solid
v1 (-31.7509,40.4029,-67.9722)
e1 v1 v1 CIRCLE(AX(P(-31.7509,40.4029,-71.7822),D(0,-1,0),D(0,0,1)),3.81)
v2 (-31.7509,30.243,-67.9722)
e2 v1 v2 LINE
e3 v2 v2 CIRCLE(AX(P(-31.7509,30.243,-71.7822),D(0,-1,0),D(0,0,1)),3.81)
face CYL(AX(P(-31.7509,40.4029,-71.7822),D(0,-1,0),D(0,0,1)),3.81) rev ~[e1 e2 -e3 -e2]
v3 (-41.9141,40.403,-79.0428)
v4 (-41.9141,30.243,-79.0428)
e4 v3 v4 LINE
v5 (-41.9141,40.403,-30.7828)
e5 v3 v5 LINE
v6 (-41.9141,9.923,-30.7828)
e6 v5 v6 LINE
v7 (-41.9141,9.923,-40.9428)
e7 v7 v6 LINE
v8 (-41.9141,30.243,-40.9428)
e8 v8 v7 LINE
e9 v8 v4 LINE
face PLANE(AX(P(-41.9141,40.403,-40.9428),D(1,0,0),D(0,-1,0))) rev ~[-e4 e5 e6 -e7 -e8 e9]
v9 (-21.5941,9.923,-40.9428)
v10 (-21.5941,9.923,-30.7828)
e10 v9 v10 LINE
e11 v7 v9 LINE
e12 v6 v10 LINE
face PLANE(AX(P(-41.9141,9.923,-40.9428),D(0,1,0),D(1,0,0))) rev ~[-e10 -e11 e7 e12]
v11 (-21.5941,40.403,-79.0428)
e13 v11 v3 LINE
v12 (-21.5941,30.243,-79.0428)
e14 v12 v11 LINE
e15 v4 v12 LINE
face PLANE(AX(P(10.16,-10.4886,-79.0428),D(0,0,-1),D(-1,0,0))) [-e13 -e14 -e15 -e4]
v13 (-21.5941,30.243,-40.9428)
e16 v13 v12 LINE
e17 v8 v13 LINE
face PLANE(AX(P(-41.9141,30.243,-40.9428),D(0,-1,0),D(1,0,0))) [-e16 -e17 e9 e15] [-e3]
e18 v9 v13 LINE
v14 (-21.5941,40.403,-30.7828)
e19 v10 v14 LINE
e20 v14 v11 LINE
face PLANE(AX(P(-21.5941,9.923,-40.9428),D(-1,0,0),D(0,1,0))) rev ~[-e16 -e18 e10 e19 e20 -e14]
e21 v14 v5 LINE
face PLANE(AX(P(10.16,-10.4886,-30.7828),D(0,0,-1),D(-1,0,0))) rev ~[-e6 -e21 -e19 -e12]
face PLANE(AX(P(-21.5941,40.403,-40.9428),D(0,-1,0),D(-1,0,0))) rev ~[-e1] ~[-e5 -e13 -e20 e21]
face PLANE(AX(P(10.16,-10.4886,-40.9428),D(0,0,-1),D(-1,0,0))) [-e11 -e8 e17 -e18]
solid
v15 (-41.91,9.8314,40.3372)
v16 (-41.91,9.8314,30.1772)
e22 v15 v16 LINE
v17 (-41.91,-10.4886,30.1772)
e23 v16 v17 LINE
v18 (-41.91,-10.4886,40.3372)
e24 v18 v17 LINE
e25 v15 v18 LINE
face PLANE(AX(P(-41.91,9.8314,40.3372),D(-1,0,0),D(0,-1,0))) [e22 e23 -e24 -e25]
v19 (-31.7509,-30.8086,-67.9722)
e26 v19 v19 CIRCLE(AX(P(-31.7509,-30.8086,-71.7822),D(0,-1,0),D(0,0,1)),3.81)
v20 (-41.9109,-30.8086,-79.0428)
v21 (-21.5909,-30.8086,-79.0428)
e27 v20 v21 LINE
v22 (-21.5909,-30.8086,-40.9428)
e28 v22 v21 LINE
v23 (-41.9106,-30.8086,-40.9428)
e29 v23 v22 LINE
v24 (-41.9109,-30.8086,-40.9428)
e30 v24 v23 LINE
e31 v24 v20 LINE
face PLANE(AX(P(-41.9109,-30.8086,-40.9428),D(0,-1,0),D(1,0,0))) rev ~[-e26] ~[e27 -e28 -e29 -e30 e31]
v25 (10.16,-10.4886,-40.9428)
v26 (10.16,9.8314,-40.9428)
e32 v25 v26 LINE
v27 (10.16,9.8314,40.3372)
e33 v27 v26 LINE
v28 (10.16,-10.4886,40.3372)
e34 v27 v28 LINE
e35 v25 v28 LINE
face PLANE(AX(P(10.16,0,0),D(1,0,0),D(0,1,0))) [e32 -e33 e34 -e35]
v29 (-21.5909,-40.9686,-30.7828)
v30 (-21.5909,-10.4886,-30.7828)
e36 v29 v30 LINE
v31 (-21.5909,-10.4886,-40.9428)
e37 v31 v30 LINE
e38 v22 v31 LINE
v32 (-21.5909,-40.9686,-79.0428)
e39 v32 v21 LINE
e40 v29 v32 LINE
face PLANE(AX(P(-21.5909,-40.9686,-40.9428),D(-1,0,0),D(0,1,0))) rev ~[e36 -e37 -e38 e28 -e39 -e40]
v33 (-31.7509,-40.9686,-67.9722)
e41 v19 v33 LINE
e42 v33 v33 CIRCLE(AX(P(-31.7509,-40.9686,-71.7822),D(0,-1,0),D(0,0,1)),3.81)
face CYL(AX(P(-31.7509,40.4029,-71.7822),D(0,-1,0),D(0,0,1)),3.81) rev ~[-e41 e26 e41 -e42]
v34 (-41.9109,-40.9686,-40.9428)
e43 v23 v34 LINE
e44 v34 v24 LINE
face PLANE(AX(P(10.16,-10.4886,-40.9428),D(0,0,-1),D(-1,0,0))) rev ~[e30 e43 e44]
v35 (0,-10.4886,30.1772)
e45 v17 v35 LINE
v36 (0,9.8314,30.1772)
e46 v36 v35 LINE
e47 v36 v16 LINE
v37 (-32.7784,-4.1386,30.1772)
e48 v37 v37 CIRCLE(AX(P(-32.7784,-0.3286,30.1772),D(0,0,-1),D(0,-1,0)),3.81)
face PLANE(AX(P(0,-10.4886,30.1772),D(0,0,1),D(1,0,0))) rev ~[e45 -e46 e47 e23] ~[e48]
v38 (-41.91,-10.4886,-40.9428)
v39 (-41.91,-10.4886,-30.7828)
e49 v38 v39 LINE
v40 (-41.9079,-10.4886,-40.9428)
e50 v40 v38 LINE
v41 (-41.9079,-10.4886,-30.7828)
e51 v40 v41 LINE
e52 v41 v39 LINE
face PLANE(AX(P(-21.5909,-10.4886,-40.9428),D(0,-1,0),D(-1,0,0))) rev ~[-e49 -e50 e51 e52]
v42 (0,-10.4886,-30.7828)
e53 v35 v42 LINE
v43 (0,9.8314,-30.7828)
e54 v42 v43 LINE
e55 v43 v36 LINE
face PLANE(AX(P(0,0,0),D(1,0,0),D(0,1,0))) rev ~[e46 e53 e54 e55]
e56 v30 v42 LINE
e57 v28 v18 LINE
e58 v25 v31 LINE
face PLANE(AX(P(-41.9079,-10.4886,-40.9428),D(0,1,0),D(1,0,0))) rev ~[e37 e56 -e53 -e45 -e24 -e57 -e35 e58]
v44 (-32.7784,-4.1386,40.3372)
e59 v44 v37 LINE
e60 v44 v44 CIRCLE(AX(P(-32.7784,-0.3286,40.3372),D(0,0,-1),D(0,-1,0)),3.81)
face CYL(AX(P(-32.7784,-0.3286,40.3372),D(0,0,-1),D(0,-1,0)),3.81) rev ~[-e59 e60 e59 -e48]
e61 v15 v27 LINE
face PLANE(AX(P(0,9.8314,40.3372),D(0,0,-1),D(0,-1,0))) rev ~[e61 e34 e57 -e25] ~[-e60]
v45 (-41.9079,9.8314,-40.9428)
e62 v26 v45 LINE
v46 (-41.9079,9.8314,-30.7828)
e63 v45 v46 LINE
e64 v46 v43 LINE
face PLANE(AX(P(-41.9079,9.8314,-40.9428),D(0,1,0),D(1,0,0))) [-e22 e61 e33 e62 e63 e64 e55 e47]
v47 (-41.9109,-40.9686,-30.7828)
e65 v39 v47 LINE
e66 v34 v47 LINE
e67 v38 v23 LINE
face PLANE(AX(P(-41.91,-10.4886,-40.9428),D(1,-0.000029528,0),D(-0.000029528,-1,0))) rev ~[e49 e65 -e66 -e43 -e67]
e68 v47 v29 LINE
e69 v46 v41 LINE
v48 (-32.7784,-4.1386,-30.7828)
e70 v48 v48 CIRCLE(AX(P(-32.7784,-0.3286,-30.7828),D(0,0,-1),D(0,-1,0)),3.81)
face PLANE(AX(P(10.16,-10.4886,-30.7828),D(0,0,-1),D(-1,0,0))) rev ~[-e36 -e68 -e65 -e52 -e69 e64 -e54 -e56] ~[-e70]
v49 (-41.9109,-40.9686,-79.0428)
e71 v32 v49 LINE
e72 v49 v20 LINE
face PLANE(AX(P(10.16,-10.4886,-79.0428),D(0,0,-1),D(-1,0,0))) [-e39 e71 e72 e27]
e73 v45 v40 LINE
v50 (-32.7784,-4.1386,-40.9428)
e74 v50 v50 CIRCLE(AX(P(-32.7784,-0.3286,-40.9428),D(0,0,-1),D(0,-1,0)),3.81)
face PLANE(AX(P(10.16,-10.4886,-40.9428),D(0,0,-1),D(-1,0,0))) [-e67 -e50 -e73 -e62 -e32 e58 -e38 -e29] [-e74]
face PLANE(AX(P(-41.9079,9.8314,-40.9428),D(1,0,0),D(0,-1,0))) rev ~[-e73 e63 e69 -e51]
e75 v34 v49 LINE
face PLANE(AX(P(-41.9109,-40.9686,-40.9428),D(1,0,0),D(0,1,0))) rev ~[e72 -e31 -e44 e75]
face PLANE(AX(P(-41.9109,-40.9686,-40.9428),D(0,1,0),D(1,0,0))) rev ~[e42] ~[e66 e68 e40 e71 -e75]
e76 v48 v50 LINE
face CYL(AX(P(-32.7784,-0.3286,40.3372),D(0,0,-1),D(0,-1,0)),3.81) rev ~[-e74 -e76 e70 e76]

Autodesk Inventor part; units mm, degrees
ref_plane "YZ Plane" through (0, 0, 0) normal (1, 0, 0) x (0, 1, 0)
ref_plane "XZ Plane" through (0, 0, 0) normal (0, 1, 0) x (-1, 0, 0)
ref_plane "XY Plane" through (0, 0, 0) normal (0, 0, 1) x (1, 0, 0)
sketch "Sketch1" plane through (0, 0, 0) normal (1, 0, 0) x (0, 1, 0)
  line L0 (9.8314, 40.3372) -> (-10.4886, 40.3372)
  line L1 (-10.4886, 40.3372) -> (-10.4886, -40.9428)
  line L2 (-10.4886, -40.9428) -> (9.8314, -40.9428)
  line L3 (9.8314, -40.9428) -> (9.8314, 40.3372)
  point P0 (0, 0)
  dimension "d0" = 20.32
  dimension "d1" = 81.28
extrude "Extrusion1" add sketch "Sketch1" along normal blind 10.16
sketch "Sketch2" plane through (0, -10.4886, 40.3372) normal (0, 0, 1) x (1, 0, 0)
  point P0 (0, 10.4886)
sketch "Sketch3" plane through (0, -10.4886, 40.3372) normal (0, 0, 1) x (1, 0, 0)
  line L0 (10.16, 0) -> (10.16, 20.32) projected
  line L1 (10.16, 20.32) -> (-41.91, 20.32)
  line L2 (-41.91, 20.32) -> (-41.91, 0)
  line L3 (-41.91, 0) -> (10.16, 0)
  line L4 (10.16, 0) -> (10.16, 20.32)
  point P0 (0, 10.4886)
  dimension "d4" = 52.07
extrude "Extrusion2" add sketch "Sketch3" against normal blind 10.16
sketch "Sketch4" plane through (0, -10.4886, -40.9428) normal (0, 0, -1) x (-1, 0, 0)
  line L0 (41.91, 20.32) -> (-10.16, 20.32) projected
  line L1 (41.91, 0) -> (-10.16, 0) projected
  line L2 (-10.16, 20.32) -> (21.59, 20.32)
  line L3 (21.59, 20.32) -> (21.59, 0)
  line L4 (21.59, 0) -> (-10.16, 0)
  line L5 (-10.16, 0) -> (-10.16, 20.32)
  point P0 (0, 10.4886)
  dimension "d7" = 31.75
extrude "Extrusion3" add sketch "Sketch4" against normal blind 10.16
sketch "Sketch5" plane through (10.16, -10.4886, -40.9428) normal (0, 0, -1) x (-1, 0, 0)
  point P0 (10.16, 10.4886)
sketch "Sketch6" plane through (10.16, -10.4886, -40.9428) normal (0, 0, -1) x (-1, 0, 0)
  line L0 (52.07, 20.32) -> (10.16, 20.32) projected
  line L1 (31.7479, 20.32) -> (52.0679, 20.32)
  line L2 (52.0679, 20.32) -> (52.0679, 0)
  line L3 (52.0679, 0) -> (31.7479, 0)
  line L4 (31.7479, 0) -> (31.7479, 20.32)
  point P0 (10.16, 10.4886)
  dimension "d10" = 20.32
  dimension "d11" = 20.32
sketch "Sketch7" plane through (10.16, -10.4886, -40.9428) normal (0, 0, -1) x (-1, 0, 0)
  line L0 (31.7541, 50.8916) -> (52.0741, 50.8916)
  line L1 (52.0741, 50.8916) -> (52.0741, 20.4116)
  line L2 (52.0741, 20.4116) -> (31.7541, 20.4116)
  line L3 (31.7541, 20.4116) -> (31.7541, 50.8916)
  point P0 (10.16, 10.4886)
  dimension "d12" = 20.32
  dimension "d13" = 30.48
sketch "Sketch8" plane through (10.16, -10.4886, -40.9428) normal (0, 0, -1) x (-1, 0, 0)
  line L0 (10.16, 0) -> (52.07, 0) projected
  line L1 (31.7509, 0) -> (52.0709, 0)
  line L2 (52.0709, 0) -> (52.0709, -30.48)
  line L3 (52.0709, -30.48) -> (31.7509, -30.48)
  line L4 (31.7509, -30.48) -> (31.7509, 0)
  point P0 (10.16, 10.4886)
  dimension "d14" = 20.32
  dimension "d15" = 30.48
extrude "Extrusion4" add sketch "Sketch7" against normal blind 10.16
extrude "Extrusion5" add sketch "Sketch8" against normal blind 10.16
extrude "Extrusion6" add sketch "Sketch6" against normal blind 10.16
sketch "Sketch9" plane through (10.16, -10.4886, -40.9428) normal (0, 0, -1) x (-1, 0, 0)
  line L0 (31.7541, 20.4116) -> (31.7541, 50.8916) projected
  line L1 (31.7541, 50.8916) -> (52.0741, 50.8916)
  line L2 (52.0741, 50.8916) -> (52.0741, 40.7316)
  line L3 (52.0741, 40.7316) -> (31.7541, 40.7316)
  line L4 (31.7541, 40.7316) -> (31.7541, 50.8916)
  line L5 (31.7509, -30.48) -> (31.7509, 0) projected
  line L6 (31.7509, -30.48) -> (52.0709, -30.48)
  line L7 (52.0709, -30.48) -> (52.0709, -20.32)
  line L8 (52.0709, -20.32) -> (31.7509, -20.32)
  line L9 (31.7509, -20.32) -> (31.7509, -30.48)
  point P0 (10.16, 10.4886)
  dimension "d22" = 20.32
  dimension "d23" = 10.16
  dimension "d24" = 20.32
  dimension "d25" = 10.16
extrude "Extrusion7" add sketch "Sketch9" along normal blind 38.1
sketch "Sketch10" plane through (-41.9141, 40.4029, -30.7828) normal (0, 1, 0) x (1, 0, 0)
  line L0 (0.0032, 48.26) -> (20.3232, 48.26) projected
  circle A0 centre (10.1632, 40.9995) radius 3.81
  point P0 (41.9141, -30.7828)
  point P1 (10.1632, 48.26)
  dimension "d28" = 7.62
hole "Hole1" at (-31.7509, 40.4029, -71.7822) direction (0, -1, 0) diameter 7.62 depth 89.3191 tip angle 118
sketch "Sketch11" plane through (10.16, -10.4886, 40.3372) normal (0, 0, 1) x (1, 0, 0)
  circle A0 centre (-42.9384, 10.16) radius 3.81
  point P0 (-10.16, 10.4886)
  dimension "d36" = 7.62
hole "Hole2" at (-32.7784, -0.3286, 40.3372) direction (0, 0, -1) diameter 7.62 depth 89.3191 tip angle 118
equation "\"d29\" = d28"
equation "\"d37\" = d28"
properties part number "Part1_New"
